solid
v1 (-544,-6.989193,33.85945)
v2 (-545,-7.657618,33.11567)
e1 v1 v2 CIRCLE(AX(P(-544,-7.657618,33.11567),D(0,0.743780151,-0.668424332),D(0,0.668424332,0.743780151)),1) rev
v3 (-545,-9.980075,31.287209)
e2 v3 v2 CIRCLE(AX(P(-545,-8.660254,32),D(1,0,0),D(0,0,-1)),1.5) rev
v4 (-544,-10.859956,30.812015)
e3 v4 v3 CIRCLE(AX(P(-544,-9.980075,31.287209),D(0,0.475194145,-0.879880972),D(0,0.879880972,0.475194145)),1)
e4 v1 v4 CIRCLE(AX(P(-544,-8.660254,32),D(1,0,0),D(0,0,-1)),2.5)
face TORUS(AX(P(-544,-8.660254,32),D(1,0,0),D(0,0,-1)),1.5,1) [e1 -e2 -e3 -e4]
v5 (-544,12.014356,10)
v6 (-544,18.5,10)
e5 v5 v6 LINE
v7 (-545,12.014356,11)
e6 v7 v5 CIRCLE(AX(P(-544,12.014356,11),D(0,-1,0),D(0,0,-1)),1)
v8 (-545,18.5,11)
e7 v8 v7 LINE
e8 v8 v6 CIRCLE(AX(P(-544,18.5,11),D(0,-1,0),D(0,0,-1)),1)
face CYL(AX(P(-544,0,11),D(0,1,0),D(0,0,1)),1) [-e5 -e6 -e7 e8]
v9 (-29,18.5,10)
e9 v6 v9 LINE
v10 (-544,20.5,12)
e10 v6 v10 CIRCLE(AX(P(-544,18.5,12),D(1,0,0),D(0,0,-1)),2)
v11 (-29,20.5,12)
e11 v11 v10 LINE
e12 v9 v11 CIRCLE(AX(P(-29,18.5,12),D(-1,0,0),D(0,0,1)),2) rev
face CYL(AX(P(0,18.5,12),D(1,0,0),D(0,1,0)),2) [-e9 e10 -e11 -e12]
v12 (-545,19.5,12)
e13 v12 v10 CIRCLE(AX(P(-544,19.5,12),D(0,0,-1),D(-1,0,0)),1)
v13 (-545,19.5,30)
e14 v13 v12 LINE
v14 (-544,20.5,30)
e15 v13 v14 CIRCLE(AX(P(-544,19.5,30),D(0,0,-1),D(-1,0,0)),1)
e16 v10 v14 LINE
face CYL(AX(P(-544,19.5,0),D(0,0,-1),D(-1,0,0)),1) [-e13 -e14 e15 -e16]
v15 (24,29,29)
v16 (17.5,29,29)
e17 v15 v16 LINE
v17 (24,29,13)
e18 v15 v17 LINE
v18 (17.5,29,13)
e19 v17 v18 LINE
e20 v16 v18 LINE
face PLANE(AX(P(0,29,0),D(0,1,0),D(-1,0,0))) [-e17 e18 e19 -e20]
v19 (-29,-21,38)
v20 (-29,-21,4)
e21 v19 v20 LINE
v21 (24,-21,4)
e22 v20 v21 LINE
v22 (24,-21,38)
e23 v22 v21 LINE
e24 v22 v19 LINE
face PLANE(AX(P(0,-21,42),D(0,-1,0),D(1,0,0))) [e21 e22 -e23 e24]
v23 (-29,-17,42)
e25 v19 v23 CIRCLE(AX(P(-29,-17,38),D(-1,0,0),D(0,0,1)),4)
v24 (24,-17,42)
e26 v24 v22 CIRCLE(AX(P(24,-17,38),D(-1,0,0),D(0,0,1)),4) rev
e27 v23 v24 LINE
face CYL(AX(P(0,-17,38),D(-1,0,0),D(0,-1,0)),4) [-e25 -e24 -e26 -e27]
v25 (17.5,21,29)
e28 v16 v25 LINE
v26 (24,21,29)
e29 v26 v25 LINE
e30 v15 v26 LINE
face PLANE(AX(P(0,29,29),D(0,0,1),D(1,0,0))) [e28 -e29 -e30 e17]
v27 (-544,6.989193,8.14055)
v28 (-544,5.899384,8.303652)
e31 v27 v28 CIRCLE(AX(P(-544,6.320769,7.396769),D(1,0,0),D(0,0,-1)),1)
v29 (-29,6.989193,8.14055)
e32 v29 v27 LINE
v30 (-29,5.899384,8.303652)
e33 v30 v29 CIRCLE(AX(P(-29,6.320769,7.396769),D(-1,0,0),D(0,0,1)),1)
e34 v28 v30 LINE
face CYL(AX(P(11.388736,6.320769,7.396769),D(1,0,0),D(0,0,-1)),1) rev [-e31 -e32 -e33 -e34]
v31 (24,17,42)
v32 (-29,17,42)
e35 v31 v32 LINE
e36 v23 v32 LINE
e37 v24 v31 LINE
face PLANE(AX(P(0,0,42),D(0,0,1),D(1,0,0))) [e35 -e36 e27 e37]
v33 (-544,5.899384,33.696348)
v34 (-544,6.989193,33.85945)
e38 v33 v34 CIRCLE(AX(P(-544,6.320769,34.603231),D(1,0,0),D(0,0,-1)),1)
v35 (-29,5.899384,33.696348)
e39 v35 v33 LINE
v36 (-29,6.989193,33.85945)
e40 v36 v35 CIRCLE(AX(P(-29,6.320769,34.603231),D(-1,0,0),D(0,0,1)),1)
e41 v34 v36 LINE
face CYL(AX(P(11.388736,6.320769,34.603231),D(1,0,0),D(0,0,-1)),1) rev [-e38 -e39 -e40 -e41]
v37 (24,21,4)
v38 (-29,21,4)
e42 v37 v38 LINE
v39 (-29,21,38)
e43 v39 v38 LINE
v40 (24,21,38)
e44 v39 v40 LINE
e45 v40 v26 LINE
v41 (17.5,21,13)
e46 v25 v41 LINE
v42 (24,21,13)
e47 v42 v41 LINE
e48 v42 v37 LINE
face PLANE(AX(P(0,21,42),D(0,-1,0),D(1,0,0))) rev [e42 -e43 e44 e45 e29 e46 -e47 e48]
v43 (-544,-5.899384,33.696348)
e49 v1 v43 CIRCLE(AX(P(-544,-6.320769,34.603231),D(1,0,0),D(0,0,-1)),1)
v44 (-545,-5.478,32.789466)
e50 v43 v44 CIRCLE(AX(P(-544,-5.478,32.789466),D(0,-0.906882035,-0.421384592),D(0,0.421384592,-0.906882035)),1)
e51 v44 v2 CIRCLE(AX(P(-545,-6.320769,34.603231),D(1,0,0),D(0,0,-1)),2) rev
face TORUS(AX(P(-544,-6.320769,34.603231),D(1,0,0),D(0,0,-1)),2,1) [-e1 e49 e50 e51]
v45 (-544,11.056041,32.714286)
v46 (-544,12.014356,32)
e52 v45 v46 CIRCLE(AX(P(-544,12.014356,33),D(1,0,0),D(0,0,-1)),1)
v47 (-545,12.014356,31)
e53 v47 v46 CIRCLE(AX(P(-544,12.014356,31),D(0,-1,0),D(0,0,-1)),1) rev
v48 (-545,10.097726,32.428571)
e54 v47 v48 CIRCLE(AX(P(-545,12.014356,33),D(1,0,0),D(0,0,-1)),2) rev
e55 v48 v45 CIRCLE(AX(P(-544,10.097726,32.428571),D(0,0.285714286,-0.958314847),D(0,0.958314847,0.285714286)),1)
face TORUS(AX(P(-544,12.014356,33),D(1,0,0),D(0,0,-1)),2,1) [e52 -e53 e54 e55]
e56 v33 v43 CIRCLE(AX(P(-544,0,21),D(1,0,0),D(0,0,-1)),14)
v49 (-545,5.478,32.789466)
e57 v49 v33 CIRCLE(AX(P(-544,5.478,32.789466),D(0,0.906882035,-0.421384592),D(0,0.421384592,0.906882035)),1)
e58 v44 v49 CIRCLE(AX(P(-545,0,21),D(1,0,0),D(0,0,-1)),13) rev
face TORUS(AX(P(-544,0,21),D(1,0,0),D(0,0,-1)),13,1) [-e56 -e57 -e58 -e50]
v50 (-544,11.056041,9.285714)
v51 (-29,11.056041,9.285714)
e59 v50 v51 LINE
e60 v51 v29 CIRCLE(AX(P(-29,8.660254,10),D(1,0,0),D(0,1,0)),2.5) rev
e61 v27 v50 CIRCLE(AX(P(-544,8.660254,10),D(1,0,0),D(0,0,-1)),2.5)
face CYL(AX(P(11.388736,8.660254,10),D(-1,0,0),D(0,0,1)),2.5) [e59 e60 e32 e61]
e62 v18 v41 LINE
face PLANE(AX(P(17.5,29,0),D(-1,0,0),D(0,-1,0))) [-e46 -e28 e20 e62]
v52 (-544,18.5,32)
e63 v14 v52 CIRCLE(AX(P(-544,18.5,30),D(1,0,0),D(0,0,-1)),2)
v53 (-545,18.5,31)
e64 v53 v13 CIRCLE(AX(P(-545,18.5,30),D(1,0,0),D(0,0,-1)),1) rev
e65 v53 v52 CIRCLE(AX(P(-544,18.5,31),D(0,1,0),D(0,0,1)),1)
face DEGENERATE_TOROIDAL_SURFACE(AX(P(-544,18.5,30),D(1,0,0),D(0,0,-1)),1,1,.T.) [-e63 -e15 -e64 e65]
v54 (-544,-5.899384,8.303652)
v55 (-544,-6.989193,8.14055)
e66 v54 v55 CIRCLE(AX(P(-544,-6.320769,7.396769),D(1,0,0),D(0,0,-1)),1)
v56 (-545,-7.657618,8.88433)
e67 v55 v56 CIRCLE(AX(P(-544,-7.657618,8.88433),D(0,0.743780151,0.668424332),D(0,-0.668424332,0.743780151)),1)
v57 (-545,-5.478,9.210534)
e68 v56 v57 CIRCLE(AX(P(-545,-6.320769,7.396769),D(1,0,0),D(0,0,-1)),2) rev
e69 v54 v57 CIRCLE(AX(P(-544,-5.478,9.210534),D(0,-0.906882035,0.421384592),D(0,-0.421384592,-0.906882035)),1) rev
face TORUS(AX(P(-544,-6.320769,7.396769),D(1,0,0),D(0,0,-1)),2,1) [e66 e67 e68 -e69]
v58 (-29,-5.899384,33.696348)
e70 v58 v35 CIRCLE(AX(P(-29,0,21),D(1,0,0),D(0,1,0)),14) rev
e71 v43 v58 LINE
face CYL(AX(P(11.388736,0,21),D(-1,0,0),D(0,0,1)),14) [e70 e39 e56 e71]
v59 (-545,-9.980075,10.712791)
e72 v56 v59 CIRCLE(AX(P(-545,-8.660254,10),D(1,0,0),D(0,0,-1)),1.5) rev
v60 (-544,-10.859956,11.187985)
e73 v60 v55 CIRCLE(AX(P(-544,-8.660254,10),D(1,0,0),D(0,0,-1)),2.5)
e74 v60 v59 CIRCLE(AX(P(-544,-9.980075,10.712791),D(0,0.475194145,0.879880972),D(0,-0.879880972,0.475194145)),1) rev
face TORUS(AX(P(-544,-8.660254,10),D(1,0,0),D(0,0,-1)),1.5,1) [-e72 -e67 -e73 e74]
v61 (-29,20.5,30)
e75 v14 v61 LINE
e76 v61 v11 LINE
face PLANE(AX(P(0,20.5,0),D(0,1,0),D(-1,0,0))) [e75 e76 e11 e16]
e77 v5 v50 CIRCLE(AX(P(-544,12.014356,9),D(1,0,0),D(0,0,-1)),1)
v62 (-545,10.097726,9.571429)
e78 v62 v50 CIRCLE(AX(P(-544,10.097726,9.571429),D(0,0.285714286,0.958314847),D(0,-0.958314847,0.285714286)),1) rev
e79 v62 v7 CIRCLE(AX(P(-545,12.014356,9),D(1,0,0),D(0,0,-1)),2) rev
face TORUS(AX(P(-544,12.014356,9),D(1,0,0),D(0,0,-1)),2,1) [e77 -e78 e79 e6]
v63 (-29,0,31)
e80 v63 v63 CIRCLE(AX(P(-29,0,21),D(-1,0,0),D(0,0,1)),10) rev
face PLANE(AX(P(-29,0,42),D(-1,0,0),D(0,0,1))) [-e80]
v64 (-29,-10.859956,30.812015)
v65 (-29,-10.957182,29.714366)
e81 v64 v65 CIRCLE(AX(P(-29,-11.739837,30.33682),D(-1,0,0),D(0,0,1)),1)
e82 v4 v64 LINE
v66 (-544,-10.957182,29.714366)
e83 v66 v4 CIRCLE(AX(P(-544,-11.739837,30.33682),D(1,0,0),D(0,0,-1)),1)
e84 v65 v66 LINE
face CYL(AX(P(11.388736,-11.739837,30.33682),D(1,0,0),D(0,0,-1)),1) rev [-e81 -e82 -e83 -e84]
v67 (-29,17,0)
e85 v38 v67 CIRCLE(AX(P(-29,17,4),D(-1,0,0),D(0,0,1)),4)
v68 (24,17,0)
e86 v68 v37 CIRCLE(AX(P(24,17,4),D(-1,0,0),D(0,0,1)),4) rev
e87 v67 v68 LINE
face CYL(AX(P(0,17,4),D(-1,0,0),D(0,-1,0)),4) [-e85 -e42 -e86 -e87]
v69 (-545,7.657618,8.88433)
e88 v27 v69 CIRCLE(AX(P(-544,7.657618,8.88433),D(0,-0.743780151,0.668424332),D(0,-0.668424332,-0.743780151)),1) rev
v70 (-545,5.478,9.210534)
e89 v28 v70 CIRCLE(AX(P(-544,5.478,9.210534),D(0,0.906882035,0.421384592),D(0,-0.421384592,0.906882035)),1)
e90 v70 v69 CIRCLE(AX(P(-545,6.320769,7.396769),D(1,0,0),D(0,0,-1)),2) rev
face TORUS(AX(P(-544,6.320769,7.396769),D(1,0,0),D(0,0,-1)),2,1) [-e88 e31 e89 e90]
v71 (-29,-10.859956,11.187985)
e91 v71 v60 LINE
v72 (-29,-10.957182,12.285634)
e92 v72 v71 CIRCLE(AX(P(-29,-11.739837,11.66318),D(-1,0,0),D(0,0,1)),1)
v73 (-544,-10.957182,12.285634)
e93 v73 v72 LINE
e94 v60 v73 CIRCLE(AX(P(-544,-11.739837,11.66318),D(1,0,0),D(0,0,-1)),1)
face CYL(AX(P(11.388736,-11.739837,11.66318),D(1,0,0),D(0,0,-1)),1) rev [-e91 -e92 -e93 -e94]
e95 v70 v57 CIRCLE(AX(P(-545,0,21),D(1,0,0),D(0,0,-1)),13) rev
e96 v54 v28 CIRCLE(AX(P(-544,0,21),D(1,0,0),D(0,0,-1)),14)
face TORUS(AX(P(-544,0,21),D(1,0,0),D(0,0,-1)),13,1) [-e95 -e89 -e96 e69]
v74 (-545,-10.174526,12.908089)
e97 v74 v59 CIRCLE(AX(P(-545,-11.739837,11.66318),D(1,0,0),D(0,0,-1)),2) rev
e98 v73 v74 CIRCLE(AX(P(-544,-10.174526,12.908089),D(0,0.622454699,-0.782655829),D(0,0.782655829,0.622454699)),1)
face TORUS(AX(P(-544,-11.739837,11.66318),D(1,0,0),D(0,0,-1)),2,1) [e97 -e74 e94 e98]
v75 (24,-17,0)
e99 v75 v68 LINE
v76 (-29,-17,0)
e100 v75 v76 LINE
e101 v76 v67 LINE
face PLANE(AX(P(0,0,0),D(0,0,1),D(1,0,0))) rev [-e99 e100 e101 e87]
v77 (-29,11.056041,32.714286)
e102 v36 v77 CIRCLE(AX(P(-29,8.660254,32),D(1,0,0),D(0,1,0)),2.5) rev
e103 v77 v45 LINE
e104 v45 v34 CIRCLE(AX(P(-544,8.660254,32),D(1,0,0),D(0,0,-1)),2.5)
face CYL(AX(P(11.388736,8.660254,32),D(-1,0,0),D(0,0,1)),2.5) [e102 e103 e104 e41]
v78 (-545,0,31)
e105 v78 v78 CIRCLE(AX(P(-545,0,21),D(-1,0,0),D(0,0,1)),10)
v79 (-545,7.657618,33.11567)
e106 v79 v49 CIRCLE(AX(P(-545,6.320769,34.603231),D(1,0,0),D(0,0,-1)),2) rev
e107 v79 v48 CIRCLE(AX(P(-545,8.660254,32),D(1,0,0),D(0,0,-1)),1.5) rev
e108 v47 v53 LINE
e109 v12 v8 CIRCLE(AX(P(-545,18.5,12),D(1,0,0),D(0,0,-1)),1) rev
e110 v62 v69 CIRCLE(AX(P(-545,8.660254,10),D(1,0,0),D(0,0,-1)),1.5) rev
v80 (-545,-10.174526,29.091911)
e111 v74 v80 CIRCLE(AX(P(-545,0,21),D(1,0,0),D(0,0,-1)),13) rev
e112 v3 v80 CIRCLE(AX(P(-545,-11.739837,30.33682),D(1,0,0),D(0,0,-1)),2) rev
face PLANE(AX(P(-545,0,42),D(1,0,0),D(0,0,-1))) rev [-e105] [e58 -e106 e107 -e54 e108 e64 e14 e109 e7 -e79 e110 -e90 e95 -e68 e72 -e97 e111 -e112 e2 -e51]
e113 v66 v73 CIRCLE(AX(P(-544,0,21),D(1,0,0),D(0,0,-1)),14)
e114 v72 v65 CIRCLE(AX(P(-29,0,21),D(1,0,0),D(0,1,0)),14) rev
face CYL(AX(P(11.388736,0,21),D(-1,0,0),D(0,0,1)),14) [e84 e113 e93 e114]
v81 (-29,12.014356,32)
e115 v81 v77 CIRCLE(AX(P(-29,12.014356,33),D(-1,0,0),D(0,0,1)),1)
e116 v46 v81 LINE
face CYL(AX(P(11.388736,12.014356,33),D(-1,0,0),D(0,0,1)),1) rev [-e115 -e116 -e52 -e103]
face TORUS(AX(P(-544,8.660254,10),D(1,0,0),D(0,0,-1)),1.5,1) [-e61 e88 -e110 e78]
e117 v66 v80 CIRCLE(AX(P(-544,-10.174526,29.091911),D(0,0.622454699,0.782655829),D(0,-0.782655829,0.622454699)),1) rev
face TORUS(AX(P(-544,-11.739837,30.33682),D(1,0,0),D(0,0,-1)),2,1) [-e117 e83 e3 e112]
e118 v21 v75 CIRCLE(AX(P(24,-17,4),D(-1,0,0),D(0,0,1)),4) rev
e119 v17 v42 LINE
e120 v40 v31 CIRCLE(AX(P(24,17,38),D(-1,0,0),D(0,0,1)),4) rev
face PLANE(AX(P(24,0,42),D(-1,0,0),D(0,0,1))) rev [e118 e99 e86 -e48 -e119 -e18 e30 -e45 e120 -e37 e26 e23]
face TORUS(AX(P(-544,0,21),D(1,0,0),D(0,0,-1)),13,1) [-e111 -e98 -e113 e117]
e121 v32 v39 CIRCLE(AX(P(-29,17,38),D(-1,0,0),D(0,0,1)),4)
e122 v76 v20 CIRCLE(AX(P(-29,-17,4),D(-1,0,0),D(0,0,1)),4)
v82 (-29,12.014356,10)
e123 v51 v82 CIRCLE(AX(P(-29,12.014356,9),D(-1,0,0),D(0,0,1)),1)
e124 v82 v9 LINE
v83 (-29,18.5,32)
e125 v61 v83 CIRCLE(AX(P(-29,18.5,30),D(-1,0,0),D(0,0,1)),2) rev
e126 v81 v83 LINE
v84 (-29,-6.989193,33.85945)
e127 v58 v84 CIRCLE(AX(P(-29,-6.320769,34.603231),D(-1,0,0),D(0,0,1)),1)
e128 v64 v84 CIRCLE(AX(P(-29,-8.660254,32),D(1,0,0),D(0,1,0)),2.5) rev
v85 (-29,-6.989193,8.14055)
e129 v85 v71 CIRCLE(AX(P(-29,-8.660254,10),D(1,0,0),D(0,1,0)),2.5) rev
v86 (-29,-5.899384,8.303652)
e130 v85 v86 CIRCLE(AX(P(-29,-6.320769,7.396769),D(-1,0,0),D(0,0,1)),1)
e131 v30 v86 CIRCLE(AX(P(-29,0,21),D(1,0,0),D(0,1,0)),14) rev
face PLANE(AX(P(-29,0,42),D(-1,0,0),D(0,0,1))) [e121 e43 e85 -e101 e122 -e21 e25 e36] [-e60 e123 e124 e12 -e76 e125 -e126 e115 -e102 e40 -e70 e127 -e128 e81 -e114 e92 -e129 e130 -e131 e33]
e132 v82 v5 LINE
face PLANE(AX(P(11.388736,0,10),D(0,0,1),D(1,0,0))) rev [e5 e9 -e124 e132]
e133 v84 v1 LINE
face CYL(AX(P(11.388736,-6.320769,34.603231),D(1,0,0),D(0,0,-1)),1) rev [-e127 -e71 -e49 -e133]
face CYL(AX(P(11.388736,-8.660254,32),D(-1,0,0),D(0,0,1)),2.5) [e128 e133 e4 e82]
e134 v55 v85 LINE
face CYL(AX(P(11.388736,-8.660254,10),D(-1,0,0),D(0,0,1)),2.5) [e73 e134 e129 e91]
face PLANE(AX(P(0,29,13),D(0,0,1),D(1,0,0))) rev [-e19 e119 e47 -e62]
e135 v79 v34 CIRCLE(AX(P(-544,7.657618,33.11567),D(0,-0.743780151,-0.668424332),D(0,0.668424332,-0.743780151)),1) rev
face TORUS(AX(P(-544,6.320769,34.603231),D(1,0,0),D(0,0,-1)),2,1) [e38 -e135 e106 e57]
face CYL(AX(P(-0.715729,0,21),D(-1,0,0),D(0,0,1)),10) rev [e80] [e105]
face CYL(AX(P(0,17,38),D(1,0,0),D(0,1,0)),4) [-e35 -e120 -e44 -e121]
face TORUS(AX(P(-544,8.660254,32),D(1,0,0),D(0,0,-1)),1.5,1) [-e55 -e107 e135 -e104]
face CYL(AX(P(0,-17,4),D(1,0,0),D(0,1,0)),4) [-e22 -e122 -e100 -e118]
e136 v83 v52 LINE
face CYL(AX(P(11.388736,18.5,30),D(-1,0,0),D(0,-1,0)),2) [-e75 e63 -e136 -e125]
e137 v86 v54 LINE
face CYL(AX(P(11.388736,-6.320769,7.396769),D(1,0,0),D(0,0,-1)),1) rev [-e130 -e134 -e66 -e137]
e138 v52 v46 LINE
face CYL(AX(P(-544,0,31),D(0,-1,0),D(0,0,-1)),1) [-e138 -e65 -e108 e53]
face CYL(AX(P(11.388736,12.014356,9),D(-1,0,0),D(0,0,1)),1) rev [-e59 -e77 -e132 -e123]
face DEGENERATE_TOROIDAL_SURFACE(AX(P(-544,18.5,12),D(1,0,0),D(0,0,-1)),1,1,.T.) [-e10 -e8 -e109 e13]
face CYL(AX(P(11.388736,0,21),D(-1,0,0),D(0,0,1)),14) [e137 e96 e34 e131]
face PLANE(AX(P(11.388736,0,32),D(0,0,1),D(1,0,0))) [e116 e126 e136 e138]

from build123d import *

# Parameters (mm, degrees)
SKETCH_1_W          = 516
SKETCH_1_H          = 35
SKETCH_1_W_2        = 5
SKETCH_1_H_2        = 42
SKETCH_1_W_3        = 48
EXTRUDE_1_DEPTH     = 42
SKETCH_3_W          = 516
SKETCH_3_H          = 42
CUT_EXTRUDE_1_DEPTH = 0.5
FILLET_1_R          = 7
SKETCH_4_R          = 10
CUT_EXTRUDE_2_DEPTH = 516
CUT_EXTRUDE_START   = -516
CUT_EXTRUDE_3_DEPTH = 516
FILLET_2_R          = 2
FILLET_3_R          = 4
FILLET_5_R          = 1
SKETCH_6_W          = 6.5
SKETCH_6_H          = 16
EXTRUDE_2_DEPTH     = 8


# Read off the part's stored shape, not the designer's step: Вырез-Вытянуть3
with BuildPart() as part:
    # Эскиз1 → Бобышка-Вытянуть1 (new body)
    with BuildSketch(Plane.XY):
        with Locations((-287, 3.5)):
            Rectangle(SKETCH_1_W, SKETCH_1_H)
        with Locations((-26.5, 0)):
            Rectangle(SKETCH_1_W_2, SKETCH_1_H_2)
        Rectangle(SKETCH_1_W_3, SKETCH_1_H_2)
    extrude(amount=EXTRUDE_1_DEPTH)

    # Эскиз3 → Вырез-Вытянуть1 (cut)
    with BuildSketch(Plane(origin=(0, 21, 0), x_dir=(1, 0, 0), z_dir=(0, 1, 0))):
        with Locations((-287, -21)):
            Rectangle(SKETCH_3_W, SKETCH_3_H)
    extrude(amount=-CUT_EXTRUDE_1_DEPTH, mode=Mode.SUBTRACT)

    # Скругление1
    fillet_1_edges = [part.edges().sort_by_distance(p)[0] for p in [
        (-287, -14, 42),
        (-287, -14, 0),
        (-287, 20.5, 0),
        (-287, 20.5, 42),
    ]]
    fillet(fillet_1_edges, radius=FILLET_1_R)

    # Эскиз4 → Вырез-Вытянуть2 (cut)
    with BuildSketch(Plane.ZY.offset(545)):
        with Locations((21, 0)):
            Circle(SKETCH_4_R)
    extrude(amount=-CUT_EXTRUDE_2_DEPTH, mode=Mode.SUBTRACT)

    # Вырез-Вытянуть3 outline → Вырез-Вытянуть3 (cut)
    with BuildSketch(Plane.ZY.offset(545).offset(CUT_EXTRUDE_START)):
        with BuildLine():
            ThreePointArc((11.715680056, -10.478616473), (8.035714286, -10.206727973), (8.63508525, -6.565735543))
            ThreePointArc((8.63508525, -6.565735543), (7, 0), (8.63508525, 6.565735543))
            ThreePointArc((8.63508525, 6.565735543), (7.60351338, 9.372189345), (10, 11.160254038))
            Line((10, 11.160254038), (10, 20.5))
            Line((10, 20.5), (7, 20.5))
            ThreePointArc((7, 20.5), (2.050252532, 18.449747468), (0, 13.5))
            Line((0, 13.5), (0, -7))
            ThreePointArc((0, -7), (2.050252532, -11.949747468), (7, -14))
            Line((7, -14), (21.000000051, -14))
            ThreePointArc((21.000000051, -14), (16.035155143, -13.090084627), (11.715680056, -10.478616473))
        make_face()
        with BuildLine():
            ThreePointArc((30.284319944, -10.478616473), (25.964844905, -13.090084609), (21.000000051, -14))
            Line((21.000000051, -14), (35, -14))
            ThreePointArc((35, -14), (39.949747468, -11.949747468), (42, -7))
            Line((42, -7), (42, 13.5))
            ThreePointArc((42, 13.5), (39.949747468, 18.449747468), (35, 20.5))
            Line((35, 20.5), (32, 20.5))
            Line((32, 20.5), (32, 11.160254038))
            ThreePointArc((32, 11.160254038), (34.39648662, 9.372189345), (33.36491475, 6.565735543))
            ThreePointArc((33.36491475, 6.565735543), (35, 0), (33.36491475, -6.565735543))
            ThreePointArc((33.36491475, -6.565735543), (33.964285714, -10.206727973), (30.284319944, -10.478616473))
        make_face()
    extrude(amount=CUT_EXTRUDE_3_DEPTH, mode=Mode.SUBTRACT)

    # Скругление2
    fillet_2_edges = [part.edges().sort_by_distance(p)[0] for p in [
        (-287, 20.5, 10),
        (-287, 20.5, 32),
    ]]
    fillet(fillet_2_edges, radius=FILLET_2_R)

    # Скругление3
    fillet_3_edges = [part.edges().sort_by_distance(p)[0] for p in [
        (-2.5, -21, 42),
        (-2.5, 21, 42),
        (-2.5, 21, 0),
        (-2.5, -21, 0),
    ]]
    fillet(fillet_3_edges, radius=FILLET_3_R)

    # Скругление5
    fillet_5_edges = [part.edges().sort_by_distance(p)[0] for p in [
        (-287, 11.160254038, 10),
        (-545, 9.372189345, 7.60351338),
        (-287, 6.565735543, 8.63508525),
        (-545, 0, 7),
        (-545, 14.830127019, 10),
        (-287, 6.565735543, 33.36491475),
        (-545, 9.372189345, 34.39648662),
        (-287, 11.160254038, 32),
        (-545, 14.830127019, 32),
        (-287, -10.478616473, 30.284319944),
        (-545, -10.206727973, 33.964285714),
        (-287, -6.565735543, 33.36491475),
        (-545, 0, 35),
        (-545, 20.5, 21),
        (-545, 19.914213562, 31.414213562),
        (-545, 19.914213562, 10.585786438),
        (-287, -6.565735543, 8.63508525),
        (-545, -10.206727973, 8.035714286),
        (-287, -10.478616473, 11.715680056),
        (-545, -13.090084627, 16.035155143),
    ]]
    fillet(fillet_5_edges, radius=FILLET_5_R)

    # Эскиз6 → Бобышка-Вытянуть2 (add)
    with BuildSketch(Plane(origin=(0, 21, 0), x_dir=(1, 0, 0), z_dir=(0, 1, 0))):
        with Locations((20.75, -21)):
            Rectangle(SKETCH_6_W, SKETCH_6_H)
    extrude(amount=EXTRUDE_2_DEPTH)


solid = part.part
